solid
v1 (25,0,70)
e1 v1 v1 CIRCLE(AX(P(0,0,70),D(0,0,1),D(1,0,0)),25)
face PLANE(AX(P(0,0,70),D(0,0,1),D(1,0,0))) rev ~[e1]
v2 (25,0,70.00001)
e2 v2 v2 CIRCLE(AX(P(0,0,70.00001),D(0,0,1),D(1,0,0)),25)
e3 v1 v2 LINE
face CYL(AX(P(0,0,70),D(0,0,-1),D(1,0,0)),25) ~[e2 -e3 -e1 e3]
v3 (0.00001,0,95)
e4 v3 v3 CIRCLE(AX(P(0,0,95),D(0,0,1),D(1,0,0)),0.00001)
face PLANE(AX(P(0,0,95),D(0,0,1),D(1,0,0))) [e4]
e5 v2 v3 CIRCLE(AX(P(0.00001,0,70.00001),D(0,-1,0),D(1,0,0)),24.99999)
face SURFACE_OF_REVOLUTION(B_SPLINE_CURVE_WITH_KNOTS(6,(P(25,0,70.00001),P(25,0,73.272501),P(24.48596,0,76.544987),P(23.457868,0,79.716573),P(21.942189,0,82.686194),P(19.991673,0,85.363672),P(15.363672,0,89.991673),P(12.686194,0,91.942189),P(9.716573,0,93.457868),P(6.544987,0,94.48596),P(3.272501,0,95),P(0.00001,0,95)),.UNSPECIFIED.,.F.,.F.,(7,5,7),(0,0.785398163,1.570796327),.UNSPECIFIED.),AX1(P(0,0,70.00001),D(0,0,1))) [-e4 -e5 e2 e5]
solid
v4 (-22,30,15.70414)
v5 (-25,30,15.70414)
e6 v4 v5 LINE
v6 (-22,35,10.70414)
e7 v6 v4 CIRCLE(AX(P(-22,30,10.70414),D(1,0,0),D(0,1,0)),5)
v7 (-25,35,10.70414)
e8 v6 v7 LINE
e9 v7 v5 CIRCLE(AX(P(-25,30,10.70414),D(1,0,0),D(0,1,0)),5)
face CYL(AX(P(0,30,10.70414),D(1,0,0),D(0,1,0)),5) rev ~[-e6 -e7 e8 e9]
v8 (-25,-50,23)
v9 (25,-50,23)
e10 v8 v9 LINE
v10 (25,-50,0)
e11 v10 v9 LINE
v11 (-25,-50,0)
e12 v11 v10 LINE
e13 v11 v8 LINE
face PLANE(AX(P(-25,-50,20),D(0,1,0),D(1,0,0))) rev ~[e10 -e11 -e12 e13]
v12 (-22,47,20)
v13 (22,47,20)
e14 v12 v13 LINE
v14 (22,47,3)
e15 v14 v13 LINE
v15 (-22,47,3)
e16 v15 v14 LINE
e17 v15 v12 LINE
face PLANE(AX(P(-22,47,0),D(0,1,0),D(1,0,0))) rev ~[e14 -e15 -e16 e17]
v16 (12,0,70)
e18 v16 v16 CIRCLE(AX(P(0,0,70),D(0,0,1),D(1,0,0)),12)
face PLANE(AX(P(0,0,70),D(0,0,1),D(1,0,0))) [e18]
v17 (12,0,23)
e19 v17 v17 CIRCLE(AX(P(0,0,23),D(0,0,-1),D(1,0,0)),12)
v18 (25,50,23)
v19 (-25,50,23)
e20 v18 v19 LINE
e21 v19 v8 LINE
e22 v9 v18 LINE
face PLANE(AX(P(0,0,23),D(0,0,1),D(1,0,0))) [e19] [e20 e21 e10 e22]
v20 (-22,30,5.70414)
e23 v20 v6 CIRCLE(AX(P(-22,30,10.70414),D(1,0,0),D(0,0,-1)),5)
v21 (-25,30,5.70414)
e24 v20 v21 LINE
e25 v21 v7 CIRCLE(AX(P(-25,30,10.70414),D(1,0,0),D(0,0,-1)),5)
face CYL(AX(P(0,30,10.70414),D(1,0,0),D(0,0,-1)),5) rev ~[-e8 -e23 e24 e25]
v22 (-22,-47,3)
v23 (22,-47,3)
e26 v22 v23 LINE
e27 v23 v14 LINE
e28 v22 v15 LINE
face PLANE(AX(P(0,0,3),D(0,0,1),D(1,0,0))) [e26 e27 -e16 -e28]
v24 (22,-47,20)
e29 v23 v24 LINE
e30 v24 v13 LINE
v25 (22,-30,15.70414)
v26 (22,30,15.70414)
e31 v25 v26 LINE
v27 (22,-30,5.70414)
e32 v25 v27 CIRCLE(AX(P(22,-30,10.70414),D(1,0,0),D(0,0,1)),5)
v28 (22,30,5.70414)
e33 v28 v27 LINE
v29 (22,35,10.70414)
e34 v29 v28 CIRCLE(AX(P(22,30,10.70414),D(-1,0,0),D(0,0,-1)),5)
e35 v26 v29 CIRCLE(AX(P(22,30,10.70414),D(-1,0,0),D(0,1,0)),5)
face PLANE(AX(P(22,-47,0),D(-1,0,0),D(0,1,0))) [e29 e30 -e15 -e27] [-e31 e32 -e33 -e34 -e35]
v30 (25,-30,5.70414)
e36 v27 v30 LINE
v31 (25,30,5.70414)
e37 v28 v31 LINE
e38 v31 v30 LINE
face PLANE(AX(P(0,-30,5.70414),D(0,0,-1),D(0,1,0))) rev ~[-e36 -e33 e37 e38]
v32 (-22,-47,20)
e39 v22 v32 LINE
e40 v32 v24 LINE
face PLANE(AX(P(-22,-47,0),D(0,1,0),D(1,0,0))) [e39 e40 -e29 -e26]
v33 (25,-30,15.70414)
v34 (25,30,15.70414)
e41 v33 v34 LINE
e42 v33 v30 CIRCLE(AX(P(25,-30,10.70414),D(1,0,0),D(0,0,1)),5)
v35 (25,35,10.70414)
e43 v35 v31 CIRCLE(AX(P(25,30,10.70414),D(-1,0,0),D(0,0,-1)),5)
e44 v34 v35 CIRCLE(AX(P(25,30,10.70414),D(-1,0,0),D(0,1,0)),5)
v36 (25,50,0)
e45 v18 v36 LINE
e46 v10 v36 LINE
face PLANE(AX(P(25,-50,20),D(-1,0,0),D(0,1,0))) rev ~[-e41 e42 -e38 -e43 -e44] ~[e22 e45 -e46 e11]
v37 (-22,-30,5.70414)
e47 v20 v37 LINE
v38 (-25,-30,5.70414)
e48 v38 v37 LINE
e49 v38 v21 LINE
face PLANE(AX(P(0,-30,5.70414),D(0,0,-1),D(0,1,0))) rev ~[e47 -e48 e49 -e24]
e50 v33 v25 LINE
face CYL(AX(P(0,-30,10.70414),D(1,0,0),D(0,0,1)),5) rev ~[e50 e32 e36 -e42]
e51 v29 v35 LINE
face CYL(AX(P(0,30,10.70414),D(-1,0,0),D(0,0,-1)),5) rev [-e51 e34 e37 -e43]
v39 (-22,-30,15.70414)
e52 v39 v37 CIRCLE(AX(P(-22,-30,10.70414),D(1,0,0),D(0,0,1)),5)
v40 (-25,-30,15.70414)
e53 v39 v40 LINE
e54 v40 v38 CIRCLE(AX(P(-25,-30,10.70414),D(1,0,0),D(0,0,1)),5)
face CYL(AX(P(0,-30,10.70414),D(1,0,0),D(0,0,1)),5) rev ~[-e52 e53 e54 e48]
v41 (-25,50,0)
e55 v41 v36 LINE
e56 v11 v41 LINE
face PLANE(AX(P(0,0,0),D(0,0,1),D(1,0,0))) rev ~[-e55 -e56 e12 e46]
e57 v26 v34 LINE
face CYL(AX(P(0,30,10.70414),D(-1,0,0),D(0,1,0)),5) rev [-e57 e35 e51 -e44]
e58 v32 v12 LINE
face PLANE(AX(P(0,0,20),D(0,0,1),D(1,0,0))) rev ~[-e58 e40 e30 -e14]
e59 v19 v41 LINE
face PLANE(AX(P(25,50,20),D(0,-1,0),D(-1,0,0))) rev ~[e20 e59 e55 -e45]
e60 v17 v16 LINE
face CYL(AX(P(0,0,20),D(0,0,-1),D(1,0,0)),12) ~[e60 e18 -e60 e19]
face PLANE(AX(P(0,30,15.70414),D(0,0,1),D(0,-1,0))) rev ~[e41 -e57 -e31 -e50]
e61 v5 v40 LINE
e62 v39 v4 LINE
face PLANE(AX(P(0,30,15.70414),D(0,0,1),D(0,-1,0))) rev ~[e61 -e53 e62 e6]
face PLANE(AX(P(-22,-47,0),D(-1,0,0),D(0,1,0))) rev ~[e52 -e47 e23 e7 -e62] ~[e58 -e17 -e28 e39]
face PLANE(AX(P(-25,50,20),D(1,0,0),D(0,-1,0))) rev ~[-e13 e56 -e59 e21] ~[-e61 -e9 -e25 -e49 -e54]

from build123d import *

# Parameters (mm, degrees)
F0_W      = 50
F0_H      = 100
F0_W_2    = 44
F0_H_2    = 94
F1_DEPTH  = 20
F2_DEPTH  = 3
F3_R      = 12
F4_DEPTH  = 3
F5_DEPTH  = 50
F6_R      = 25
F6_R_2    = 12
F7_DEPTH  = 25
F8_R      = 24.99999
F10_DEPTH = 30


# Not quite as in the source:
# - a fillet or chamfer is up to 0.001 mm smaller than in the source, because OpenCascade refuses the exact size
# - a feature names something its author has since deleted; it is built from what else it names


with BuildPart() as f1:
    # F0 (on Top) → F1 (new body)
    with BuildSketch(Plane.XY):
        Rectangle(F0_W, F0_H)
        Rectangle(F0_W_2, F0_H_2, mode=Mode.SUBTRACT)
    extrude(amount=F1_DEPTH)

    # F0 (on Top) → F2 (join)
    with BuildSketch(Plane.XY):
        Rectangle(F0_W, F0_H)
        Rectangle(F0_W_2, F0_H_2, mode=Mode.SUBTRACT)
        Rectangle(F0_W_2, F0_H_2)
    extrude(amount=F2_DEPTH)

    # F3 (on face) → F4 (join)
    with BuildSketch(Plane.XY.offset(20)):
        with BuildLine():
            ThreePointArc((22, 11.874342087), (0, 25), (-22, 11.874342087))
            Line((-22, 11.874342087), (-22, -11.874342087))
            ThreePointArc((-22, -11.874342087), (0, -25), (22, -11.874342087))
            Line((22, -11.874342087), (22, 11.874342087))
        make_face()
        Circle(F3_R, mode=Mode.SUBTRACT)
        with BuildLine():
            ThreePointArc((22, -11.874342087), (0, -25), (-22, -11.874342087))
            Line((-22, -11.874342087), (-22, -47))
            Line((-22, -47), (22, -47))
            Line((22, -47), (22, -11.874342087))
        make_face()
        with BuildLine():
            Line((-22, 47), (-22, 11.874342087))
            ThreePointArc((-22, 11.874342087), (0, 25), (22, 11.874342087))
            Line((22, 11.874342087), (22, 47))
            Line((22, 47), (-22, 47))
        make_face()
        Circle(F3_R)
        with BuildLine():
            Line((25, 50), (-25, 50))
            Line((-25, 50), (-25, -5.13e-08))
            ThreePointArc((-25, -5.13e-08), (-24.2383992934, 6.1237243321), (-22, 11.874342087))
            Line((-22, 11.874342087), (-22, 47))
            Line((-22, 47), (22, 47))
            Line((22, 47), (22, 11.874342087))
            ThreePointArc((22, 11.874342087), (24.2383992871, 6.123724357), (25, 0))
            Line((25, 0), (25, 50))
        make_face()
        with BuildLine():
            ThreePointArc((-22, -11.874342087), (-24.2383992808, -6.1237243818), (-25, -5.13e-08))
            Line((-25, -5.13e-08), (-25, -50))
            Line((-25, -50), (25, -50))
            Line((25, -50), (25, 0))
            ThreePointArc((25, 0), (24.2383992871, -6.123724357), (22, -11.874342087))
            Line((22, -11.874342087), (22, -47))
            Line((22, -47), (-22, -47))
            Line((-22, -47), (-22, -11.874342087))
        make_face()
        with BuildLine():
            ThreePointArc((22, -11.874342087), (24.2383992871, -6.123724357), (25, 0))
            ThreePointArc((25, 0), (24.2383992871, 6.123724357), (22, 11.874342087))
            Line((22, 11.874342087), (22, -11.874342087))
        make_face()
        with BuildLine():
            ThreePointArc((-22, 11.874342087), (-24.2383992934, 6.1237243321), (-25, -5.13e-08))
            ThreePointArc((-25, -5.13e-08), (-24.2383992808, -6.1237243818), (-22, -11.874342087))
            Line((-22, -11.874342087), (-22, 11.874342087))
        make_face()
    extrude(amount=F4_DEPTH)

    # F3 (on face) → F5 (join)
    with BuildSketch(Plane.XY.offset(20)):
        Circle(F3_R)
    extrude(amount=F5_DEPTH)

    # F9 (on Right) → F10 (cut, symmetric)
    with BuildSketch(Plane.YZ):
        with BuildLine():
            ThreePointArc((-25, 10.7041401789), (-26.4644660941, 14.2396740848), (-30, 15.7041401789))
            ThreePointArc((-30, 15.7041401789), (-35, 10.7041401789), (-30, 5.7041401789))
            ThreePointArc((-30, 5.7041401789), (-26.4644660941, 7.1686062729), (-25, 10.7041401789))
        make_face()
        with BuildLine():
            ThreePointArc((30, 5.7041401789), (25, 10.7041401789), (30, 15.7041401789))
            Line((30, 15.7041401789), (-30, 15.7041401789))
            ThreePointArc((-30, 15.7041401789), (-26.4644660941, 14.2396740848), (-25, 10.7041401789))
            ThreePointArc((-25, 10.7041401789), (-26.4644660941, 7.1686062729), (-30, 5.7041401789))
            Line((-30, 5.7041401789), (30, 5.7041401789))
        make_face()
        with BuildLine():
            ThreePointArc((30, 5.7041401789), (33.5355339059, 7.1686062729), (35, 10.7041401789))
            ThreePointArc((35, 10.7041401789), (33.5355339059, 14.2396740848), (30, 15.7041401789))
            ThreePointArc((30, 15.7041401789), (25, 10.7041401789), (30, 5.7041401789))
        make_face()
    extrude(amount=F10_DEPTH, both=True, mode=Mode.SUBTRACT)


with BuildPart() as f7:
    # F6 (on face) → F7 (new body)
    with BuildSketch(Plane.XY.offset(70)):
        Circle(F6_R)
        Circle(F6_R_2, mode=Mode.SUBTRACT)
        Circle(F6_R_2)
    extrude(amount=F7_DEPTH)

    # F8 (radius 25 in the source; OpenCascade refuses exactly that, so slightly less here)
    f8_edges = [f7.edges().sort_by_distance(p)[0] for p in [
        (-25, 0, 95),
    ]]
    fillet(f8_edges, radius=F8_R)


solid = Compound([f1.part, f7.part])
